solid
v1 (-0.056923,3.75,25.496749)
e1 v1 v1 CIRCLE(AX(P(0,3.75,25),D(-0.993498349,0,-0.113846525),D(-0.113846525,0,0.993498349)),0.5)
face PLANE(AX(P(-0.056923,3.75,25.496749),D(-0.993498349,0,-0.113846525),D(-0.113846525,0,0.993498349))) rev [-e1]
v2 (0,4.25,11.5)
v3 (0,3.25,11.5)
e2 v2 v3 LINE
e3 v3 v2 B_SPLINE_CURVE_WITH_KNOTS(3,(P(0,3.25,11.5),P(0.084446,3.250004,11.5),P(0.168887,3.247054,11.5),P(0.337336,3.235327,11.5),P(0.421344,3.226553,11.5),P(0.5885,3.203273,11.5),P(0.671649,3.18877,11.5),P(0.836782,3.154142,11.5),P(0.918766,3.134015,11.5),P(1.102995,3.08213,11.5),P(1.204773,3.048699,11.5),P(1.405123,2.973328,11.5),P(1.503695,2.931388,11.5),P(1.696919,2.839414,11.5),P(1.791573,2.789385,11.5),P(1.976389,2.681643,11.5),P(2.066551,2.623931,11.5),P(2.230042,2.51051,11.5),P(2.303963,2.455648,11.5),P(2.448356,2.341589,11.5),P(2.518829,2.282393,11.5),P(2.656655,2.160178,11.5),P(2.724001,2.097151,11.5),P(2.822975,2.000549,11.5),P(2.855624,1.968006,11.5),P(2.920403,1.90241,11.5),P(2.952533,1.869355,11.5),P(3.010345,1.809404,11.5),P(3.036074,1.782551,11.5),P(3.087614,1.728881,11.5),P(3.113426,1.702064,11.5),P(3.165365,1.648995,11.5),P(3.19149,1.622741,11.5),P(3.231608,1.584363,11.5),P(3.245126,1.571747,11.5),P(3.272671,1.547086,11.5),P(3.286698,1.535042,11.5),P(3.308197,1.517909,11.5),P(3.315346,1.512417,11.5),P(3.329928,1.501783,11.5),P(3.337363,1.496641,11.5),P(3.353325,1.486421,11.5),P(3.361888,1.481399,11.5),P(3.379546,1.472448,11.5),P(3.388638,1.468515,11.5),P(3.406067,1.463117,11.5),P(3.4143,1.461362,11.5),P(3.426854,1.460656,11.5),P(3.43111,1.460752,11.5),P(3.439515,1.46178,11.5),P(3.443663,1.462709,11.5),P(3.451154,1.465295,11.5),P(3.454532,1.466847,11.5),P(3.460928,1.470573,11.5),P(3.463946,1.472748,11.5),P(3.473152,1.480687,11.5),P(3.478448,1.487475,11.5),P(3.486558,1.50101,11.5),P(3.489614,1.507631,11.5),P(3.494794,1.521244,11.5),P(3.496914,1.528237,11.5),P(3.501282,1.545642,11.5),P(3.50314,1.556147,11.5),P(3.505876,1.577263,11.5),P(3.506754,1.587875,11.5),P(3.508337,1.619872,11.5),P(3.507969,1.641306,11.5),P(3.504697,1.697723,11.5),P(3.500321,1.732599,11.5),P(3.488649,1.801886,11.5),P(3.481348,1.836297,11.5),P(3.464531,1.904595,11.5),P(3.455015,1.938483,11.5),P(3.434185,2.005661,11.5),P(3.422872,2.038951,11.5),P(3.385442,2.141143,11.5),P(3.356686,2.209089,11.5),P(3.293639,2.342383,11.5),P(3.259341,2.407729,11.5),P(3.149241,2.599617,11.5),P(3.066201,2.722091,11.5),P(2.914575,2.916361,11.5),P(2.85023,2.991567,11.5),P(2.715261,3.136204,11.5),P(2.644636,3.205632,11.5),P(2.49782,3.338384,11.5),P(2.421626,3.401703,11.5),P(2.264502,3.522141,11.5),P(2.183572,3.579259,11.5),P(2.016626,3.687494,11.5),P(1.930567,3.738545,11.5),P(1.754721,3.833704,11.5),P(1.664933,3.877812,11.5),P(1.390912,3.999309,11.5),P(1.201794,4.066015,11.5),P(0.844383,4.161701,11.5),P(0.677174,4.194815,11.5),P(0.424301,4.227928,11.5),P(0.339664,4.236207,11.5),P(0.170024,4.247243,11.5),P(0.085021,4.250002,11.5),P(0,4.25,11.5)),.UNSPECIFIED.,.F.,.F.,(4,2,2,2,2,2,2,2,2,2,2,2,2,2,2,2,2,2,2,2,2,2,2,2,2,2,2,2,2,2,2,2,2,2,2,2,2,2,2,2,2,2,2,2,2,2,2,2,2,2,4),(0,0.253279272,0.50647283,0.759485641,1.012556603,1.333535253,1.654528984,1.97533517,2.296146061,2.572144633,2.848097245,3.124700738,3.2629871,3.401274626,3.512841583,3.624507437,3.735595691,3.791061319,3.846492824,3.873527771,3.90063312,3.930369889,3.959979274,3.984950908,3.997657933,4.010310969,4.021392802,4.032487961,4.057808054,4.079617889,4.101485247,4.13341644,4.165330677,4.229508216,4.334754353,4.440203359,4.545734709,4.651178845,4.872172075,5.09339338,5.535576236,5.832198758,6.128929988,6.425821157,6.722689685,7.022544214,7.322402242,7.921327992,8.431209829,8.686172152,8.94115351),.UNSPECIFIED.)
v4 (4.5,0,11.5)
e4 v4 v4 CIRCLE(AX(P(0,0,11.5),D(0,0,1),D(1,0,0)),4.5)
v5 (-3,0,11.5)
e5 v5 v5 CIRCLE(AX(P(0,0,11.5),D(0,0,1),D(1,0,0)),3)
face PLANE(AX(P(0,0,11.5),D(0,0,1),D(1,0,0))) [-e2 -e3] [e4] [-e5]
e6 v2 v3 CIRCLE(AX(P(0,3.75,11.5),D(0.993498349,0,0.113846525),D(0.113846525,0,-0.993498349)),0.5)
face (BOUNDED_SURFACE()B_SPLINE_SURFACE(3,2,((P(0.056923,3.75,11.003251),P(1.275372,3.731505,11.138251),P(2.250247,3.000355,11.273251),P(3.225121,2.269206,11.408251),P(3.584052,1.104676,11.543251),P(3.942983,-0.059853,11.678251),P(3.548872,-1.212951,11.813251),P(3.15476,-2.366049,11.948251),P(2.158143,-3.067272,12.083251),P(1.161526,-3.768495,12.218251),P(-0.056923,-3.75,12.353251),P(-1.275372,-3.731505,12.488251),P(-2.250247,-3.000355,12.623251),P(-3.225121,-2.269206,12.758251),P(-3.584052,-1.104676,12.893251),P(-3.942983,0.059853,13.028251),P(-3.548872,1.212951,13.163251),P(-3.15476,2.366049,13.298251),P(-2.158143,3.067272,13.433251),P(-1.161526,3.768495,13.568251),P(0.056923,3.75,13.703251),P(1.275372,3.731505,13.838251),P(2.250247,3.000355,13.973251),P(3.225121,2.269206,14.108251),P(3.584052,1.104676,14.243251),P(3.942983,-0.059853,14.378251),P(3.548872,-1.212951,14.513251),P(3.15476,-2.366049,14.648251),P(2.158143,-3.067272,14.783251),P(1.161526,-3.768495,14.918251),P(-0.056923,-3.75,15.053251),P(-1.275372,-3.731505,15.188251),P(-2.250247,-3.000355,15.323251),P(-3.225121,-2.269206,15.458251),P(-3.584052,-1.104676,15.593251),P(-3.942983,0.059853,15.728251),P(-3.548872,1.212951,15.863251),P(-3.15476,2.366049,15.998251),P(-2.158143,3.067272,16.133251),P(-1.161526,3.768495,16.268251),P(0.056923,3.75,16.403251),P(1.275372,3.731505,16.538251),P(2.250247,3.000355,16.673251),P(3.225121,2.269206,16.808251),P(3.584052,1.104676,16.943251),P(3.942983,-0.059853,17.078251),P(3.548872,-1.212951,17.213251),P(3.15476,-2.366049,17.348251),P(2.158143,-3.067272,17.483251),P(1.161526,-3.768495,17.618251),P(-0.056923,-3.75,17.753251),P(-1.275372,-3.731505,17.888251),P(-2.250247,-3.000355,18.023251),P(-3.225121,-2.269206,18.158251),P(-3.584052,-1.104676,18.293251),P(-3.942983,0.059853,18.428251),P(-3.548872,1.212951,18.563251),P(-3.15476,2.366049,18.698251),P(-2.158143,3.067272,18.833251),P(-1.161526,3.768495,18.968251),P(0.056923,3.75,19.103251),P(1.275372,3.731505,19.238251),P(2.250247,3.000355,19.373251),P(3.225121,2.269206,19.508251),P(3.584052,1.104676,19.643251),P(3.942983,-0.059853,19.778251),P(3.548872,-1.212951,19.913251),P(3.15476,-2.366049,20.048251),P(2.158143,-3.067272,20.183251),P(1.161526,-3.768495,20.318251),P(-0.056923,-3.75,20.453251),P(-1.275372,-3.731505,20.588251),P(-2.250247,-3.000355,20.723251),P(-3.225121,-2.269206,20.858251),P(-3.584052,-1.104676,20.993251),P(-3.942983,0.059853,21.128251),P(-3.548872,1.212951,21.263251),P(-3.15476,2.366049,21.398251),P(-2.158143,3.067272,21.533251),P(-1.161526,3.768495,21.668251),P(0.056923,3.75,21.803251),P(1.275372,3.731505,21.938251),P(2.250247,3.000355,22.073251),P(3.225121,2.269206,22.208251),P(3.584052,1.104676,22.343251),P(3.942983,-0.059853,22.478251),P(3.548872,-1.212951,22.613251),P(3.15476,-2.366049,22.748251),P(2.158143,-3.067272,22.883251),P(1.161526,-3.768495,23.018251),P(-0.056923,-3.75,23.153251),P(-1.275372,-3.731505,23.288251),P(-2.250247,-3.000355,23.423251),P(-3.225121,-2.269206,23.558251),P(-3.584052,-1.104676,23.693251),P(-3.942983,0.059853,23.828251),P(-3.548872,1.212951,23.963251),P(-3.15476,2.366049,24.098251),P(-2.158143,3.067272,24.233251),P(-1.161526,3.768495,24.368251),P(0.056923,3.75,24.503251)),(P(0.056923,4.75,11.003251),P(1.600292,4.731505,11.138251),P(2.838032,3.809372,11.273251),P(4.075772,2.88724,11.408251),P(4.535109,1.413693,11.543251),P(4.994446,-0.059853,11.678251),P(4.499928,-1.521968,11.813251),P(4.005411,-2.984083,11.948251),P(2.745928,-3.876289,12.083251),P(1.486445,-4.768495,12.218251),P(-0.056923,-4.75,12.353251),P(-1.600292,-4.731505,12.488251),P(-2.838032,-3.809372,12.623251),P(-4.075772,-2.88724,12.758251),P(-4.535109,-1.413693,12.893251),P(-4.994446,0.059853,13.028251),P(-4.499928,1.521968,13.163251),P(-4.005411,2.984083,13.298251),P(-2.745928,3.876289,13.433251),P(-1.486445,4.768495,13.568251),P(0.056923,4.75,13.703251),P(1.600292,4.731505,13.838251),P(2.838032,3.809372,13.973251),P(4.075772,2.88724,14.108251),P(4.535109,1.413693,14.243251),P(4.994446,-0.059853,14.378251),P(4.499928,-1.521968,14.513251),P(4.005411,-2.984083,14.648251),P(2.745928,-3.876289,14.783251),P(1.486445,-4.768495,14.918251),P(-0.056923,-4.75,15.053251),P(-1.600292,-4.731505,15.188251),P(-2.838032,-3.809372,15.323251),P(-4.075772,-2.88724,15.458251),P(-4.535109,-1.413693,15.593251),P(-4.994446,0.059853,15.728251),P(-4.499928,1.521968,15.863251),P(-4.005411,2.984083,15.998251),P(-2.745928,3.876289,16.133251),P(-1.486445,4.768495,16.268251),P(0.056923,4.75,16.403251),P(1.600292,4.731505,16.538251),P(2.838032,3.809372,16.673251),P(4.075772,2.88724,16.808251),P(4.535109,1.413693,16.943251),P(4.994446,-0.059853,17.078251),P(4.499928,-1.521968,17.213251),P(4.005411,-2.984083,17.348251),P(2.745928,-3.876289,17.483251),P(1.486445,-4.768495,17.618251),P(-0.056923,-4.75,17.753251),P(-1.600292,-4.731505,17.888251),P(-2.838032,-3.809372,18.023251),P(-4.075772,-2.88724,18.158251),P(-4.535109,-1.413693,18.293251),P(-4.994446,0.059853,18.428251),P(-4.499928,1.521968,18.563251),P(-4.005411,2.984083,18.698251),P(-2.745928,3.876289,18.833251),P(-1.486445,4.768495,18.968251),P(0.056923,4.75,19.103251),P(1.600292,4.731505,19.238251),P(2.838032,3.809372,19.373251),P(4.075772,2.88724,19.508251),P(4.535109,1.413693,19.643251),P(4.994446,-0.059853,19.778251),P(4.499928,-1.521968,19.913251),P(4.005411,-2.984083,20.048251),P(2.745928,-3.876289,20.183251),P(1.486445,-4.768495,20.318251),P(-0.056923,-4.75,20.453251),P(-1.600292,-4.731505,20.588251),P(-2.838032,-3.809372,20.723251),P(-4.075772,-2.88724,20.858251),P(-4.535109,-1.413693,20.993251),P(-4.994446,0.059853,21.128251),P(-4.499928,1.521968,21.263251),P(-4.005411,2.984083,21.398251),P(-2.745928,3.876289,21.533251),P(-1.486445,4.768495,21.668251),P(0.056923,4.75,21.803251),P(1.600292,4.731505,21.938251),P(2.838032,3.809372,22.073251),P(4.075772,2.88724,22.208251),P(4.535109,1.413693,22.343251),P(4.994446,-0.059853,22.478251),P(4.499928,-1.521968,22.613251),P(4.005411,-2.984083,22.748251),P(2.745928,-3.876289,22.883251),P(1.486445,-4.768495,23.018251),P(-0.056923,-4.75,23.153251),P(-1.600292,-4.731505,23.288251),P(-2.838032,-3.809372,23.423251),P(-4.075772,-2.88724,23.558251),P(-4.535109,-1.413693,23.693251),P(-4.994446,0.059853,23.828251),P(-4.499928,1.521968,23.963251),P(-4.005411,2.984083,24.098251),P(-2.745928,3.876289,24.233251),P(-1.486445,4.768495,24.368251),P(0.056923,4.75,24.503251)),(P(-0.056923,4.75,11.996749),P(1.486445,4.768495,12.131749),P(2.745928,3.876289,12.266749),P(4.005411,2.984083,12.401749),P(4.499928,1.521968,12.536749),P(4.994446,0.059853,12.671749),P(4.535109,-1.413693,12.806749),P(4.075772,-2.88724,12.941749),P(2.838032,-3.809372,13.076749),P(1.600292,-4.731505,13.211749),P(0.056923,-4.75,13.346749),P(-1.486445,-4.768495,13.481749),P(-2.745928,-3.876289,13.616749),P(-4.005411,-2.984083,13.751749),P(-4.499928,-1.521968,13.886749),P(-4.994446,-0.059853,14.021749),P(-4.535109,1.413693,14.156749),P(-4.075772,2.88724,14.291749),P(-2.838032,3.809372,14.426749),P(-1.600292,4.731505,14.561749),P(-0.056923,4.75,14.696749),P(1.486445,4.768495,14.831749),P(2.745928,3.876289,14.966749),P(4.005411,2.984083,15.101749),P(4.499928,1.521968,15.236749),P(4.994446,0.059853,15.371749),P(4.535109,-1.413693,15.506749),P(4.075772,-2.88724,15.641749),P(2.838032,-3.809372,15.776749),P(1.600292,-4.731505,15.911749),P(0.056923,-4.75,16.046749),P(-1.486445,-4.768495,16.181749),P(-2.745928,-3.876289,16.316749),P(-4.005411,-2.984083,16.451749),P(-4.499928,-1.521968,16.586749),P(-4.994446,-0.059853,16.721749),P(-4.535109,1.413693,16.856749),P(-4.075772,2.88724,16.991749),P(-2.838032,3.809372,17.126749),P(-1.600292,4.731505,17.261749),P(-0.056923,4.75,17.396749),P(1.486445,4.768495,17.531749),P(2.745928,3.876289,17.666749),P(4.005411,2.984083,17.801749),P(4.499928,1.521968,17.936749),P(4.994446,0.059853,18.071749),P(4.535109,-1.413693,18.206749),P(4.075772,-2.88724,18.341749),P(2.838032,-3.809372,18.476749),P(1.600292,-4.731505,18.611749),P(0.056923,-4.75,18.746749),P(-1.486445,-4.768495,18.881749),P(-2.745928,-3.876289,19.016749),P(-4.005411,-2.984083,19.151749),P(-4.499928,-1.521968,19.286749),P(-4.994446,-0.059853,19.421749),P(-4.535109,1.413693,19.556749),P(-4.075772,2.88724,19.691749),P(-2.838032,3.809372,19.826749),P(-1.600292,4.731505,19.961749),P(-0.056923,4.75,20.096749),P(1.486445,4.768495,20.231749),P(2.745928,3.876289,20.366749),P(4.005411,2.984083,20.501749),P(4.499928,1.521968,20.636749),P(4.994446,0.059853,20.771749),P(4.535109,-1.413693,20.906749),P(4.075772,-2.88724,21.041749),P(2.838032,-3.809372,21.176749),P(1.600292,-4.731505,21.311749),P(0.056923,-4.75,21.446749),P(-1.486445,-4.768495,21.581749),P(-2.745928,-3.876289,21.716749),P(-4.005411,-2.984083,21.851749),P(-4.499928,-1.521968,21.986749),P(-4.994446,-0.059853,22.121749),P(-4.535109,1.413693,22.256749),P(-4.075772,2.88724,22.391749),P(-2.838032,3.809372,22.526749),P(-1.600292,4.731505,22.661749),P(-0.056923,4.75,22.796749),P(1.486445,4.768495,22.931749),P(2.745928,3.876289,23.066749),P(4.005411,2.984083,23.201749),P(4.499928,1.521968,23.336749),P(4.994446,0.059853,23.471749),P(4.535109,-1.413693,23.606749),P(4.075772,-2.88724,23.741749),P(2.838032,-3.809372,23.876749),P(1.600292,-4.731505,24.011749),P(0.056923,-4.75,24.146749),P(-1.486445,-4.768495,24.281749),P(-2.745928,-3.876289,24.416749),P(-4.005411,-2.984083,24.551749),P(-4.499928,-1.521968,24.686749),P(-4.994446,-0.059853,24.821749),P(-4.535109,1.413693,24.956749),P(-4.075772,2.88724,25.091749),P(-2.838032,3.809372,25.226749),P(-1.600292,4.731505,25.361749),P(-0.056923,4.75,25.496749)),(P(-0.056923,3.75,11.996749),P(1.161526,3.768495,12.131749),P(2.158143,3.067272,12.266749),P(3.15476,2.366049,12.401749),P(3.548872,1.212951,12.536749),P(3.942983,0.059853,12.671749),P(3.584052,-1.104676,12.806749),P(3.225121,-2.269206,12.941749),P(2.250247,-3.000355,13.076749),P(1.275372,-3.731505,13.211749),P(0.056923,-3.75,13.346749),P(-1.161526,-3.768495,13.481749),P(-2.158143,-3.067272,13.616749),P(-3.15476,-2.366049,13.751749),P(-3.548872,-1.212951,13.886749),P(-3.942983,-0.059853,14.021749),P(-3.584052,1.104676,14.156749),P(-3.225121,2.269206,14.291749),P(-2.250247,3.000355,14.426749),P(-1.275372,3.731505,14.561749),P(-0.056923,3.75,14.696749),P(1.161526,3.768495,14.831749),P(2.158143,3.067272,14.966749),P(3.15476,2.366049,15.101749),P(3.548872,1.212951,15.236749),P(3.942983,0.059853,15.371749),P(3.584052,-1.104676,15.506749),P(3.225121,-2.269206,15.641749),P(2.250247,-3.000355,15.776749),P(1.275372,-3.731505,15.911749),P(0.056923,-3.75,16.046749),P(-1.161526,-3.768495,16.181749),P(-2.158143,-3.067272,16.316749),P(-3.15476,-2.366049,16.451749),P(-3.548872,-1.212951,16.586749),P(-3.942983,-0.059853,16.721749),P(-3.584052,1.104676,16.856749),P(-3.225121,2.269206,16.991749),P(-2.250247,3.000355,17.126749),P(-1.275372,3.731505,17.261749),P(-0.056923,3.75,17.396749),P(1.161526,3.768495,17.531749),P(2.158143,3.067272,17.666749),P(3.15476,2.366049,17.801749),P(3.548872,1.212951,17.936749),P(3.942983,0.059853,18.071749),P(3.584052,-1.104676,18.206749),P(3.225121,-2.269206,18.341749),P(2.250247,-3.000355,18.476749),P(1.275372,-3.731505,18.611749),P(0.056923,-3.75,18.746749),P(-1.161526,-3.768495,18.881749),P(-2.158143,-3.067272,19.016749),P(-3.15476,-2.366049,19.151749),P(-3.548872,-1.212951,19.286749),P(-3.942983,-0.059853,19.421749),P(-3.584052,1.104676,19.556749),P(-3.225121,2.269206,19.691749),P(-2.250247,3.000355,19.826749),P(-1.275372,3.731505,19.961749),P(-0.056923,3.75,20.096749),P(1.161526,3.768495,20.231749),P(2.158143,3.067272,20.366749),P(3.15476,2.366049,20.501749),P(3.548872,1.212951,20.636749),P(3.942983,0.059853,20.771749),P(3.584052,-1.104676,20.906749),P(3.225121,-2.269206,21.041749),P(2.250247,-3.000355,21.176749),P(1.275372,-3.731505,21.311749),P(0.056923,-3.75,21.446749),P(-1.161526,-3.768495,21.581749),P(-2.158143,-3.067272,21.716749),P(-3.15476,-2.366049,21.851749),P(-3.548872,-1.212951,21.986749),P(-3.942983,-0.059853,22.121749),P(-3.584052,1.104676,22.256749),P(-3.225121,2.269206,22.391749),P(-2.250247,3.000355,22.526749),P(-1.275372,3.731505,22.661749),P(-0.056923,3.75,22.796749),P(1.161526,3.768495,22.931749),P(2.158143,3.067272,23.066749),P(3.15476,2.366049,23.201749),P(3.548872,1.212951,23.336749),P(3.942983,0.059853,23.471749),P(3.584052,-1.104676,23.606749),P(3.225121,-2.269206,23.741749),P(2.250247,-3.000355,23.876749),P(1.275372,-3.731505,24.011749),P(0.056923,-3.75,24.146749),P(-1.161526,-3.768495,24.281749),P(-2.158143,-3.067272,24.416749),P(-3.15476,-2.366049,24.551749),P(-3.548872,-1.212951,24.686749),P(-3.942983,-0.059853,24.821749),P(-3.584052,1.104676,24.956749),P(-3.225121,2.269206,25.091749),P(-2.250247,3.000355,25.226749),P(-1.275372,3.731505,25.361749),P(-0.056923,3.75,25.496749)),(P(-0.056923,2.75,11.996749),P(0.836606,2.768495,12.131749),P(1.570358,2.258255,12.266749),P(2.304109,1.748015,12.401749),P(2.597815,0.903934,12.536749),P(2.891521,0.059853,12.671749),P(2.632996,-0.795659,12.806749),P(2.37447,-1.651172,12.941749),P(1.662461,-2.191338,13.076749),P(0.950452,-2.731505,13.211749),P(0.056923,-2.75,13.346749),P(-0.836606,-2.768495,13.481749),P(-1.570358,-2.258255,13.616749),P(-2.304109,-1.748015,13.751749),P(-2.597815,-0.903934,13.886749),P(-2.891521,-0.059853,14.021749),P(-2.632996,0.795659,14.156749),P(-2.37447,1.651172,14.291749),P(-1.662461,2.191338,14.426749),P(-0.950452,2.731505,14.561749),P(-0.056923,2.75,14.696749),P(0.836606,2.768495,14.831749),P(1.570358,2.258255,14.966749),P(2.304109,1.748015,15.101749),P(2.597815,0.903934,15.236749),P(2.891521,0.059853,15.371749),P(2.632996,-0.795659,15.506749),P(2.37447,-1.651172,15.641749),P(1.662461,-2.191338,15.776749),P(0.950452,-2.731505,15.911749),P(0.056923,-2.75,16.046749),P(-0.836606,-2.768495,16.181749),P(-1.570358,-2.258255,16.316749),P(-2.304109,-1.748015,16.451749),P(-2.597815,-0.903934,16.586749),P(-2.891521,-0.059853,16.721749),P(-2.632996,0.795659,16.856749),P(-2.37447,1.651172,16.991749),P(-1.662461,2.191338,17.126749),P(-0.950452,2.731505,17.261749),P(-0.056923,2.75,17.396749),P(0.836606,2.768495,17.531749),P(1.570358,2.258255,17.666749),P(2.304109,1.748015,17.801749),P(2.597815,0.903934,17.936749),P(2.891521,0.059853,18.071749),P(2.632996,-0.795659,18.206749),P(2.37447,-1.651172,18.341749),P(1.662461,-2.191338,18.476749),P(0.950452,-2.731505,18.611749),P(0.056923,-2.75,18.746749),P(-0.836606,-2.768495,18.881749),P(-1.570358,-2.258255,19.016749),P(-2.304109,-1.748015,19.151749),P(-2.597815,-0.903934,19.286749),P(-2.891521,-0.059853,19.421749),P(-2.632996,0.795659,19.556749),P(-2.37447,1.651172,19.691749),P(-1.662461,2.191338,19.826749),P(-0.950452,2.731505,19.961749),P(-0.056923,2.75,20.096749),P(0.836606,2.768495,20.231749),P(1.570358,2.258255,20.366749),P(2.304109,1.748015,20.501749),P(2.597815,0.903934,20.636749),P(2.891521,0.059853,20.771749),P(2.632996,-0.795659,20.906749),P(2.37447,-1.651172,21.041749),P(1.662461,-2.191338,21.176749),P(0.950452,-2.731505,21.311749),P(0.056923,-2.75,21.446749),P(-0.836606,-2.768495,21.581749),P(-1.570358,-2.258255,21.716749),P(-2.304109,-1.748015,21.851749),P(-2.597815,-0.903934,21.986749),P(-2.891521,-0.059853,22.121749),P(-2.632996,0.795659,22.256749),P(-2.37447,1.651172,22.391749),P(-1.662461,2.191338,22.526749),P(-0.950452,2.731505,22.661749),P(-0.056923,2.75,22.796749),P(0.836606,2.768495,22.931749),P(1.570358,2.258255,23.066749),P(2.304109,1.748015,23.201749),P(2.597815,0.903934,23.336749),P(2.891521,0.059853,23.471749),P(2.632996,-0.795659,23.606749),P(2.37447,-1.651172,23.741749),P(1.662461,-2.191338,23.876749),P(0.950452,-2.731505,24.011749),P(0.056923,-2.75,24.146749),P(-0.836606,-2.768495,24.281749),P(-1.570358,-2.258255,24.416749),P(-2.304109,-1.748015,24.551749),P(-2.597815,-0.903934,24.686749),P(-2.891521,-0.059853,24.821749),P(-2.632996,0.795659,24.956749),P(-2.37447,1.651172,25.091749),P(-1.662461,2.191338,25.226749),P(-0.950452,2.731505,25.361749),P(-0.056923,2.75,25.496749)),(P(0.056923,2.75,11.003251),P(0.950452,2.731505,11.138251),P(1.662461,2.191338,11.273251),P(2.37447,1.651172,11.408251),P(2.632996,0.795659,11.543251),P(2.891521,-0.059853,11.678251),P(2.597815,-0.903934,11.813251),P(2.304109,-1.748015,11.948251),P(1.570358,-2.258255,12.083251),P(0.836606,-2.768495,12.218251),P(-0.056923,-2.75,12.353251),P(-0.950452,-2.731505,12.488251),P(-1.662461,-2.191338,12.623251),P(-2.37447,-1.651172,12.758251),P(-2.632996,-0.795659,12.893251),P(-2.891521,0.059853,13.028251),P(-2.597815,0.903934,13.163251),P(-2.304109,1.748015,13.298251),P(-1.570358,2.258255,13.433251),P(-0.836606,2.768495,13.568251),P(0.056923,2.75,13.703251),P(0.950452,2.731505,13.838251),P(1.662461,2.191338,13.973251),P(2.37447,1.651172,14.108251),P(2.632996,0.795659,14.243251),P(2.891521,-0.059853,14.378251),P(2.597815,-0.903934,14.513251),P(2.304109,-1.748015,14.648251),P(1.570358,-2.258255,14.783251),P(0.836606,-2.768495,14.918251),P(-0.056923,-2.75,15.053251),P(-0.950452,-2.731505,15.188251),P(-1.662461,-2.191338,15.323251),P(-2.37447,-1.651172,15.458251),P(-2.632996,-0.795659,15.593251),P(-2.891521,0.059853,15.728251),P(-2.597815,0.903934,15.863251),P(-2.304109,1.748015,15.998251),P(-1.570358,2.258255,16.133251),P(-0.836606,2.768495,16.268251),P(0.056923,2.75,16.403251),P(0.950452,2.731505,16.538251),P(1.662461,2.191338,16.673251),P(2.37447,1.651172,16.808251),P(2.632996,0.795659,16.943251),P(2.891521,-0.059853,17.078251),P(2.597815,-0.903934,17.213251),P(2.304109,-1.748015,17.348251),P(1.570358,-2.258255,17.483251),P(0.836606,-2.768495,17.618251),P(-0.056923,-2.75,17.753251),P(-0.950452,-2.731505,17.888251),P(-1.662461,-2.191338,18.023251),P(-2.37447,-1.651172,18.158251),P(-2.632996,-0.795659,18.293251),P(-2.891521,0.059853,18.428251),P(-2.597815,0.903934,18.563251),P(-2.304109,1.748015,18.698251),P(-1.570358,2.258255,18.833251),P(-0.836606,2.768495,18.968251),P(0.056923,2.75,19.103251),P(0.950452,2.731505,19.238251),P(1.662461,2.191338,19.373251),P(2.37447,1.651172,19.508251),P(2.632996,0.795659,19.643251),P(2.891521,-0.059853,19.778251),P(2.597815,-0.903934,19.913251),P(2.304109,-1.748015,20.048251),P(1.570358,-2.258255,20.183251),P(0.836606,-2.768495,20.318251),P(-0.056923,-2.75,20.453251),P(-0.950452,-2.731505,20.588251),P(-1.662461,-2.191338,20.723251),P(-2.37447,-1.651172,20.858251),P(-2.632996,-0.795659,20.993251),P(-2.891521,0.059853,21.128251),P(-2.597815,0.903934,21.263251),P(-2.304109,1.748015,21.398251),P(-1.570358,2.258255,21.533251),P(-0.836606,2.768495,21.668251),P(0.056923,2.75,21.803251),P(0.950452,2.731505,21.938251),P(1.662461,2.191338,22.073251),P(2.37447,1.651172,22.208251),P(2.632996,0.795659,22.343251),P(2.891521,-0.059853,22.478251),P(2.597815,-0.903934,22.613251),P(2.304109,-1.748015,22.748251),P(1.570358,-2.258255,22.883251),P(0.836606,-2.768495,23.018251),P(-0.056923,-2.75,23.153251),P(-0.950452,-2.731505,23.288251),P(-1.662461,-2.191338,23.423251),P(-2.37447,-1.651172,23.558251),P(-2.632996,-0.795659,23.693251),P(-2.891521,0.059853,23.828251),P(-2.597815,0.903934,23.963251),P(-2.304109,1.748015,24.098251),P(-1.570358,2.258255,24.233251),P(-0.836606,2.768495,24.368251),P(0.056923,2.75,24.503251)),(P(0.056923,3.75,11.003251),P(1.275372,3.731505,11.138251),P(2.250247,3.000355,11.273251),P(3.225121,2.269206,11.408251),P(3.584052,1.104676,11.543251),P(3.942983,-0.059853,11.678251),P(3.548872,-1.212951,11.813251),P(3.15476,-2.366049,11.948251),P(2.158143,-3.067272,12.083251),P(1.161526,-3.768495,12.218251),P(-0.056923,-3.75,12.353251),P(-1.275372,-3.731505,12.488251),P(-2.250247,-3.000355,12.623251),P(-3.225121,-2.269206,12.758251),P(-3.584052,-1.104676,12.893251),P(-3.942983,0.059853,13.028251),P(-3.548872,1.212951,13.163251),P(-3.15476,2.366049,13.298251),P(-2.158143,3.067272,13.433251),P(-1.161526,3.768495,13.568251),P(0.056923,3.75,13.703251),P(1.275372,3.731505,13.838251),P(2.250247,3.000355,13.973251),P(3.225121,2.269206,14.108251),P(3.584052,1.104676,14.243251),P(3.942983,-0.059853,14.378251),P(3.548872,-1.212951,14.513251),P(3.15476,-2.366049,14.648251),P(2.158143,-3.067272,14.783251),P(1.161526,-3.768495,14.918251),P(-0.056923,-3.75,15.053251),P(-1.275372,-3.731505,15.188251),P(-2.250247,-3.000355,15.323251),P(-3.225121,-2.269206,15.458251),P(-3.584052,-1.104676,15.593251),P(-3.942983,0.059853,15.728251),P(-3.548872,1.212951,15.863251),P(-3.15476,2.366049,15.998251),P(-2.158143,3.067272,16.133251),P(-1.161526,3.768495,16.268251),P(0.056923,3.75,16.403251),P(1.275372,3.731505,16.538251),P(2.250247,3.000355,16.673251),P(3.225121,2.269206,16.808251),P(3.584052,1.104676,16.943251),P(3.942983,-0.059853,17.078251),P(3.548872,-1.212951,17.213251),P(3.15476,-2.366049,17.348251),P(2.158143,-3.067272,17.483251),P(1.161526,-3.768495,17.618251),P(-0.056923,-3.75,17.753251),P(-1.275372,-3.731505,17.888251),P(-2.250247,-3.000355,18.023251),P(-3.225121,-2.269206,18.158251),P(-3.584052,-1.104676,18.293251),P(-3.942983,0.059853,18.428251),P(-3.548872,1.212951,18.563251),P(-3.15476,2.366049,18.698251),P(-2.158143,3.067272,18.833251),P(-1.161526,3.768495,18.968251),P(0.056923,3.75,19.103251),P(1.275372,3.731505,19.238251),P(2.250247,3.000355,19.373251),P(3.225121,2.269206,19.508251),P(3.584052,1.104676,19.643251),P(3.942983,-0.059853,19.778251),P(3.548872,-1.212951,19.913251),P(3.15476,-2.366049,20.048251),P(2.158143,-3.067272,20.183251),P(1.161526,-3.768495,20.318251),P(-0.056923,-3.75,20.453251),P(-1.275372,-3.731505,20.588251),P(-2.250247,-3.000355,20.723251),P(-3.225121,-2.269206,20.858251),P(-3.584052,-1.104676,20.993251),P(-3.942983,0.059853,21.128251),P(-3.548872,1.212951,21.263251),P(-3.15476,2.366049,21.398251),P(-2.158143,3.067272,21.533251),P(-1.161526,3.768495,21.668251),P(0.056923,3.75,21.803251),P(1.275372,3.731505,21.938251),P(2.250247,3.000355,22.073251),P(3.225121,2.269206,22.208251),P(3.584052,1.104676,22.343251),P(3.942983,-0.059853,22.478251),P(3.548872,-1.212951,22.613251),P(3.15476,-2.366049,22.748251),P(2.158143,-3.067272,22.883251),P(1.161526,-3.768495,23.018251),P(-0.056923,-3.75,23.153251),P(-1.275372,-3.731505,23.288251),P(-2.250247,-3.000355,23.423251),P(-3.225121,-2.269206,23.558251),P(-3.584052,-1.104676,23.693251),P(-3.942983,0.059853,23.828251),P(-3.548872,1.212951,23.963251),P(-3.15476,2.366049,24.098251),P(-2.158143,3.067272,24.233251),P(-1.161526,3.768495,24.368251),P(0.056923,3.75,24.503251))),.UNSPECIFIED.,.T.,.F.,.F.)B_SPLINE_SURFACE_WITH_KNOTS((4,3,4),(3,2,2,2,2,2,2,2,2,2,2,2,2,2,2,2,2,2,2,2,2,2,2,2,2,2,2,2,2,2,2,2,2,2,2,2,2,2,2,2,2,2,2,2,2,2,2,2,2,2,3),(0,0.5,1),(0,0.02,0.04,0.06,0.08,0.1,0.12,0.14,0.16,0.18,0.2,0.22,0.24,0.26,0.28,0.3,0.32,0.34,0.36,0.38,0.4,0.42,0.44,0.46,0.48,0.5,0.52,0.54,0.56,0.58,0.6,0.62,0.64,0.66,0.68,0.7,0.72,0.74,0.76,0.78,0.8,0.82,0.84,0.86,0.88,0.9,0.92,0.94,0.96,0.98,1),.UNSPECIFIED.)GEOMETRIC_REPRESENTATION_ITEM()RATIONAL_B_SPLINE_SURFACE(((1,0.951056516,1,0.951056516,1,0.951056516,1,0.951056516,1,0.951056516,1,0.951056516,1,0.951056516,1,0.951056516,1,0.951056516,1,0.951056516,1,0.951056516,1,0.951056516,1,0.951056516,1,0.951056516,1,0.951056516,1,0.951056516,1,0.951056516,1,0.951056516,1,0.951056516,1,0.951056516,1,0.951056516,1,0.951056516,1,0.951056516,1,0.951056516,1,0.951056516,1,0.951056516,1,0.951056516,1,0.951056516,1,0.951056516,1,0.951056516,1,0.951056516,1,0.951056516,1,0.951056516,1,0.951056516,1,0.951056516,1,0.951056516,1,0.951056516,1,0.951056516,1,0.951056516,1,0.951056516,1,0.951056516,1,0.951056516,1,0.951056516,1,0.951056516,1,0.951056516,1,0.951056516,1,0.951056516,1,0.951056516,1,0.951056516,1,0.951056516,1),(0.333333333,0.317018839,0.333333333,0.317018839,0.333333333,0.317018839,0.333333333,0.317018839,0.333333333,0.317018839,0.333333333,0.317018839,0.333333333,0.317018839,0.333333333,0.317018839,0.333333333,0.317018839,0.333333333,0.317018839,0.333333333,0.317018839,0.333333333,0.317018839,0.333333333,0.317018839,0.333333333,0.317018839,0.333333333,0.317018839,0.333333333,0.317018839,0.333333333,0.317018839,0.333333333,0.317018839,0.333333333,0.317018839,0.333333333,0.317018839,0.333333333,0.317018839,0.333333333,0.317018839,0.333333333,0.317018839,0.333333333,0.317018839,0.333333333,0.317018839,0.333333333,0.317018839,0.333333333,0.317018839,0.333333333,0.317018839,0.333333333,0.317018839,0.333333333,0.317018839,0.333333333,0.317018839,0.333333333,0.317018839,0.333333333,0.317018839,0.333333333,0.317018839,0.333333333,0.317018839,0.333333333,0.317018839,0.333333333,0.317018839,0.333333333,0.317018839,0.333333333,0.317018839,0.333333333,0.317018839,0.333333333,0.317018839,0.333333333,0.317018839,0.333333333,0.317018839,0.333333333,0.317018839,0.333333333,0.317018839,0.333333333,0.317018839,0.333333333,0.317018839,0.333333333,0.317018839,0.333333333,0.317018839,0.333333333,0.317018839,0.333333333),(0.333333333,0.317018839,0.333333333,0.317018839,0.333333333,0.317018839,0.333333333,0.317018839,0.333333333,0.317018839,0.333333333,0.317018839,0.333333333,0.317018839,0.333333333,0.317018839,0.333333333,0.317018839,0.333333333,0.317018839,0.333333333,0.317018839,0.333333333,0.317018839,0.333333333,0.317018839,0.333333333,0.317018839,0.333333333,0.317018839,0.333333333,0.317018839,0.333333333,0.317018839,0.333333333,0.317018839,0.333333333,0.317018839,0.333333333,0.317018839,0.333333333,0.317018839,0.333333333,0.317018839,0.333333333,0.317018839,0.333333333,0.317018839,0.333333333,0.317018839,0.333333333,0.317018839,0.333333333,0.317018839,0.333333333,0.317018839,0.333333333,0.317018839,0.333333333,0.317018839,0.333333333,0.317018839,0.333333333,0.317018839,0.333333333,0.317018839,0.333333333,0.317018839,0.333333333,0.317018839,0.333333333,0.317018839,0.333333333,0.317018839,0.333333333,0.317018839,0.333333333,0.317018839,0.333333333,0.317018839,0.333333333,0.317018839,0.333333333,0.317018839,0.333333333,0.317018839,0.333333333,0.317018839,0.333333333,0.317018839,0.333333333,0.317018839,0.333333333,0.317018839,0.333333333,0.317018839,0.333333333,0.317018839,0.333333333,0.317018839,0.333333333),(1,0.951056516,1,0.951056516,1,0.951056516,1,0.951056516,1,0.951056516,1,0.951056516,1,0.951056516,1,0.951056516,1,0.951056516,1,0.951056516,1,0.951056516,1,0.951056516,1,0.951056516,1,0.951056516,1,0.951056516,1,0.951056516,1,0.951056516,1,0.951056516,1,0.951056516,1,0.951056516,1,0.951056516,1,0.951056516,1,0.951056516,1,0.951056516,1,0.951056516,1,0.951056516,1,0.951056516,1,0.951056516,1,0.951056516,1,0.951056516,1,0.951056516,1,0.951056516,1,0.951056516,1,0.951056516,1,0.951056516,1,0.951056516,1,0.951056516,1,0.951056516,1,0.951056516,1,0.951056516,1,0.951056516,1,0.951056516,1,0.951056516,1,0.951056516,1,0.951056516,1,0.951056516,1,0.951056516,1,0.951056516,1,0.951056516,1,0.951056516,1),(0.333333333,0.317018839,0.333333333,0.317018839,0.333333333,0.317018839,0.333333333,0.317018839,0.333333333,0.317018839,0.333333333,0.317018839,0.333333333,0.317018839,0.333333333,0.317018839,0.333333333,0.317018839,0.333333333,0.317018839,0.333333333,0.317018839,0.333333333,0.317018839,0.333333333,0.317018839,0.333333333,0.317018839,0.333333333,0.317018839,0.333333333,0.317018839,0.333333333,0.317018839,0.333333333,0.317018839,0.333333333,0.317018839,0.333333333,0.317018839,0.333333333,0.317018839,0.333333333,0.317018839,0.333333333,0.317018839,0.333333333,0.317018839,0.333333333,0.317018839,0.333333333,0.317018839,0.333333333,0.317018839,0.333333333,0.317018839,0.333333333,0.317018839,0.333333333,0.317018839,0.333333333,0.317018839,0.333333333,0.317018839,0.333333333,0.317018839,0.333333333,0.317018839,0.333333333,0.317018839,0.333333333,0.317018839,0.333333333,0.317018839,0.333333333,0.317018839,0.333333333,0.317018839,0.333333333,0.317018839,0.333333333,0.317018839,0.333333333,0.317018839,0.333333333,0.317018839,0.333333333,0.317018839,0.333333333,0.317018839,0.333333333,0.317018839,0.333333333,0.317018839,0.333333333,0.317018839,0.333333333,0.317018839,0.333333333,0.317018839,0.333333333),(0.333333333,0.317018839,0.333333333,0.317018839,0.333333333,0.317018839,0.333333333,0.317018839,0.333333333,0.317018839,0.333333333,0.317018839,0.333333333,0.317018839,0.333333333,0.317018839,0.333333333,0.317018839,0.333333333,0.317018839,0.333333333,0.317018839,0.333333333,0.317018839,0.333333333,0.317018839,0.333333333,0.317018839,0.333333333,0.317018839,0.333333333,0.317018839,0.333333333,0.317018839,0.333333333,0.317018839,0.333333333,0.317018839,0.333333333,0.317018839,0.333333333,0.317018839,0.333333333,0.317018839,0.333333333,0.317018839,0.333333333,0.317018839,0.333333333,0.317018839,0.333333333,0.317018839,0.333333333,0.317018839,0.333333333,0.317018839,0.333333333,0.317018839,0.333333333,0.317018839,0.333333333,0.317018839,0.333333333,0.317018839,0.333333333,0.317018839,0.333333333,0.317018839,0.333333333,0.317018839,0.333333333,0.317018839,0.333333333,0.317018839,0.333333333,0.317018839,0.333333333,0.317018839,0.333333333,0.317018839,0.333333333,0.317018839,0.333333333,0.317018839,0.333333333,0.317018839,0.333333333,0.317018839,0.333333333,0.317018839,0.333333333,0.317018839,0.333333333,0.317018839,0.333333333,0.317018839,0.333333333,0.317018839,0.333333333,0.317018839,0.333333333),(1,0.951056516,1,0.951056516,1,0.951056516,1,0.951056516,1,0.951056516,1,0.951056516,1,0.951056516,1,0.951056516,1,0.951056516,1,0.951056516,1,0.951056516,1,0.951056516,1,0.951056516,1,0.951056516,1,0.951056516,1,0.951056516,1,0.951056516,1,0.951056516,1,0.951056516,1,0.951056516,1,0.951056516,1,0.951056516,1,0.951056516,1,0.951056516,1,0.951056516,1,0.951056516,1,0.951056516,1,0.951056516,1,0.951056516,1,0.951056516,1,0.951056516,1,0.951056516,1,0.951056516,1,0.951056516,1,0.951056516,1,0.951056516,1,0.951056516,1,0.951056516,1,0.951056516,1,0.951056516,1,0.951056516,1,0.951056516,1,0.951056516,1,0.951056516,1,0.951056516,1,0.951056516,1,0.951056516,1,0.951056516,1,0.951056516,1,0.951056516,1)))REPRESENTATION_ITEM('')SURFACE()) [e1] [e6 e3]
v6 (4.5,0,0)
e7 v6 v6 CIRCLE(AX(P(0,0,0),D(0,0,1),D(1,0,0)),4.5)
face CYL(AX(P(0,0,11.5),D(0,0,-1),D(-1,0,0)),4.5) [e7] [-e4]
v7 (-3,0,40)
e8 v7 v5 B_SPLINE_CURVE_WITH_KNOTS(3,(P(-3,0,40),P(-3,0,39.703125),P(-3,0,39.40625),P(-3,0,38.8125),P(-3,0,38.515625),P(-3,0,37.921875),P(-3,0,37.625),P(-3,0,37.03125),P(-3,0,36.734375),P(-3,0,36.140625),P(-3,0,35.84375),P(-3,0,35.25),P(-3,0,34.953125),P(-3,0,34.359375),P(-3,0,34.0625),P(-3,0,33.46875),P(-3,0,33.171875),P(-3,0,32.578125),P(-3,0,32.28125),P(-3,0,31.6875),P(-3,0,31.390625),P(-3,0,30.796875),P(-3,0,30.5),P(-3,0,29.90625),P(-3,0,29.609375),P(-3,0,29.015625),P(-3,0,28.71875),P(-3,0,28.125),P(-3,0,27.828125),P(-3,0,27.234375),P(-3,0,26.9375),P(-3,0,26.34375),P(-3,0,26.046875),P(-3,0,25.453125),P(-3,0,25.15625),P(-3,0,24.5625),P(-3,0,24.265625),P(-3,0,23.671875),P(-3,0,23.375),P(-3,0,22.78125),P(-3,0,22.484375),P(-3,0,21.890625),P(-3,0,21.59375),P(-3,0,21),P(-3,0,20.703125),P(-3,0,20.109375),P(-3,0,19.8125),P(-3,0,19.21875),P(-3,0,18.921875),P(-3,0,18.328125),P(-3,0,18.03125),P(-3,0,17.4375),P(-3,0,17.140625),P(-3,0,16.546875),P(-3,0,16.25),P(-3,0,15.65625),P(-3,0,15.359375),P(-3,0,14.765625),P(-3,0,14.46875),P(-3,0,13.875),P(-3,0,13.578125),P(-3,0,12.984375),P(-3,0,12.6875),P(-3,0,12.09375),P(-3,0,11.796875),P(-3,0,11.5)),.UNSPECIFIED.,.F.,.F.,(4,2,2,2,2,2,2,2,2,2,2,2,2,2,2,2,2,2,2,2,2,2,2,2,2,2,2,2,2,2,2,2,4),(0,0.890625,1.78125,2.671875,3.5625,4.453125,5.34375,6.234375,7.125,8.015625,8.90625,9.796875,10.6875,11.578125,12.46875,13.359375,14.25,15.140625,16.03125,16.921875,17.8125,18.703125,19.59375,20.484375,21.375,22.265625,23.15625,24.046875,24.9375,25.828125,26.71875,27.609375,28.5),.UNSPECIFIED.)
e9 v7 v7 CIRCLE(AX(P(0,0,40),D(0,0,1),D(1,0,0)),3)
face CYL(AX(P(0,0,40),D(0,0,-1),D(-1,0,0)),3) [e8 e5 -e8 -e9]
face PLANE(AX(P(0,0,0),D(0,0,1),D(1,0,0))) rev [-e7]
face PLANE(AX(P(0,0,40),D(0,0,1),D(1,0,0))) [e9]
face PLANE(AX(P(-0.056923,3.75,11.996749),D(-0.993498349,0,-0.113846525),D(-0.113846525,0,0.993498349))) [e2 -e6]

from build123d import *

# Parameters (mm, degrees)
SKETCH1_R           = 4.5
BOSS_EXTRUDE2_DEPTH = 11.5
SKETCH16_R          = 3
BOSS_EXTRUDE3_DEPTH = 28.5
SWEEP2_PITCH        = 2.7


with BuildPart() as part:
    # Sketch1 → Boss-Extrude2 (new body)
    with BuildSketch(Plane.XY):
        Circle(SKETCH1_R)
    extrude(amount=BOSS_EXTRUDE2_DEPTH)

    # Sketch16 → Boss-Extrude3 (add)
    with BuildSketch(Plane.XY.offset(11.5)):
        with Locations(Location((0, 0, 0), (0, 0, 180))):
            Circle(SKETCH16_R)
    extrude(amount=BOSS_EXTRUDE3_DEPTH)

    # Sweep2: the profile of Sweep2 profile screwed along a left-hand helix of 5 turns, 10 arcs to a turn; built about Z, then put on its axis
    sweep2_z = Axis((0, 0, 0), (0, 0, 1))
    sweep2_corners = [(3.75, 0.056923262, 0.496749174), (3.25, 0, 0), (3.75, -0.056923262, -0.496749174), (4.25, 0, 0)]
    with BuildLine(mode=Mode.PRIVATE) as sweep2_profile:
        ThreePointArc((3.75, 0.056923262, 0.496749174), (3.396446609, 0.040250825, 0.35125471), (3.25, 0, 0))
        ThreePointArc((3.25, 0, 0), (3.396446609, -0.040250825, -0.35125471), (3.75, -0.056923262, -0.496749174))
        ThreePointArc((3.75, -0.056923262, -0.496749174), (4.103553391, -0.040250825, -0.35125471), (4.25, 0, 0))
        ThreePointArc((4.25, 0, 0), (4.103553391, 0.040250825, 0.35125471), (3.75, 0.056923262, 0.496749174))
    sweep2_cap = Face(sweep2_profile.wire())
    sweep2_arcs = [((3.75, 0.056923262, 0.496749174), (3.25, 0.056923262, 0.496749174), (3.25, 0, 0), (1, 0.7071067811865476, 1)), ((3.25, 0, 0), (3.25, -0.056923262, -0.496749174), (3.75, -0.056923262, -0.496749174), (1, 0.7071067811865476, 1)), ((3.75, -0.056923262, -0.496749174), (4.25, -0.056923262, -0.496749174), (4.25, 0, 0), (1, 0.7071067811865476, 1)), ((4.25, 0, 0), (4.25, 0.056923262, 0.496749174), (3.75, 0.056923262, 0.496749174), (1, 0.7071067811865476, 1))]  # start, shoulder, end, weights
    sweep2_turn_angles = [0, -18, -36, -54, -72, -90, -108, -126, -144, -162, -180, -198, -216, -234, -252, -270, -288, -306, -324, -342, -360]
    sweep2_turn_weights = [1, 0.9510565162951535, 1, 0.9510565162951535, 1, 0.9510565162951535, 1, 0.9510565162951535, 1, 0.9510565162951535, 1, 0.9510565162951535, 1, 0.9510565162951535, 1, 0.9510565162951535, 1, 0.9510565162951535, 1, 0.9510565162951535, 1]
    sweep2_turn_sides = [Face.make_bezier_surface([[Vector(p[j][0], p[j][1], 0).rotate(sweep2_z, sweep2_turn_angles[2 * i + k]) / sweep2_turn_weights[2 * i + k] + Vector(0, 0, p[j][2] + -SWEEP2_PITCH * sweep2_turn_angles[2 * i + k] / 360) for k in range(3)] for j in range(3)], [[p[3][j] * sweep2_turn_weights[2 * i + k] for k in range(3)] for j in range(3)]) for p in sweep2_arcs for i in range(10)]
    sweep2 = Plane(origin=(0, 0, 11.5), x_dir=(0, 1, 0), z_dir=(0, 0, 1)) * Solid(Shell([*[p.moved(Location((0, 0, SWEEP2_PITCH * i))) for i in range(5) for p in sweep2_turn_sides], sweep2_cap, sweep2_cap.rotate(sweep2_z, -1800).moved(Location((0, 0, -SWEEP2_PITCH * -1800 / 360)))]))
    add(sweep2)


solid = part.part
